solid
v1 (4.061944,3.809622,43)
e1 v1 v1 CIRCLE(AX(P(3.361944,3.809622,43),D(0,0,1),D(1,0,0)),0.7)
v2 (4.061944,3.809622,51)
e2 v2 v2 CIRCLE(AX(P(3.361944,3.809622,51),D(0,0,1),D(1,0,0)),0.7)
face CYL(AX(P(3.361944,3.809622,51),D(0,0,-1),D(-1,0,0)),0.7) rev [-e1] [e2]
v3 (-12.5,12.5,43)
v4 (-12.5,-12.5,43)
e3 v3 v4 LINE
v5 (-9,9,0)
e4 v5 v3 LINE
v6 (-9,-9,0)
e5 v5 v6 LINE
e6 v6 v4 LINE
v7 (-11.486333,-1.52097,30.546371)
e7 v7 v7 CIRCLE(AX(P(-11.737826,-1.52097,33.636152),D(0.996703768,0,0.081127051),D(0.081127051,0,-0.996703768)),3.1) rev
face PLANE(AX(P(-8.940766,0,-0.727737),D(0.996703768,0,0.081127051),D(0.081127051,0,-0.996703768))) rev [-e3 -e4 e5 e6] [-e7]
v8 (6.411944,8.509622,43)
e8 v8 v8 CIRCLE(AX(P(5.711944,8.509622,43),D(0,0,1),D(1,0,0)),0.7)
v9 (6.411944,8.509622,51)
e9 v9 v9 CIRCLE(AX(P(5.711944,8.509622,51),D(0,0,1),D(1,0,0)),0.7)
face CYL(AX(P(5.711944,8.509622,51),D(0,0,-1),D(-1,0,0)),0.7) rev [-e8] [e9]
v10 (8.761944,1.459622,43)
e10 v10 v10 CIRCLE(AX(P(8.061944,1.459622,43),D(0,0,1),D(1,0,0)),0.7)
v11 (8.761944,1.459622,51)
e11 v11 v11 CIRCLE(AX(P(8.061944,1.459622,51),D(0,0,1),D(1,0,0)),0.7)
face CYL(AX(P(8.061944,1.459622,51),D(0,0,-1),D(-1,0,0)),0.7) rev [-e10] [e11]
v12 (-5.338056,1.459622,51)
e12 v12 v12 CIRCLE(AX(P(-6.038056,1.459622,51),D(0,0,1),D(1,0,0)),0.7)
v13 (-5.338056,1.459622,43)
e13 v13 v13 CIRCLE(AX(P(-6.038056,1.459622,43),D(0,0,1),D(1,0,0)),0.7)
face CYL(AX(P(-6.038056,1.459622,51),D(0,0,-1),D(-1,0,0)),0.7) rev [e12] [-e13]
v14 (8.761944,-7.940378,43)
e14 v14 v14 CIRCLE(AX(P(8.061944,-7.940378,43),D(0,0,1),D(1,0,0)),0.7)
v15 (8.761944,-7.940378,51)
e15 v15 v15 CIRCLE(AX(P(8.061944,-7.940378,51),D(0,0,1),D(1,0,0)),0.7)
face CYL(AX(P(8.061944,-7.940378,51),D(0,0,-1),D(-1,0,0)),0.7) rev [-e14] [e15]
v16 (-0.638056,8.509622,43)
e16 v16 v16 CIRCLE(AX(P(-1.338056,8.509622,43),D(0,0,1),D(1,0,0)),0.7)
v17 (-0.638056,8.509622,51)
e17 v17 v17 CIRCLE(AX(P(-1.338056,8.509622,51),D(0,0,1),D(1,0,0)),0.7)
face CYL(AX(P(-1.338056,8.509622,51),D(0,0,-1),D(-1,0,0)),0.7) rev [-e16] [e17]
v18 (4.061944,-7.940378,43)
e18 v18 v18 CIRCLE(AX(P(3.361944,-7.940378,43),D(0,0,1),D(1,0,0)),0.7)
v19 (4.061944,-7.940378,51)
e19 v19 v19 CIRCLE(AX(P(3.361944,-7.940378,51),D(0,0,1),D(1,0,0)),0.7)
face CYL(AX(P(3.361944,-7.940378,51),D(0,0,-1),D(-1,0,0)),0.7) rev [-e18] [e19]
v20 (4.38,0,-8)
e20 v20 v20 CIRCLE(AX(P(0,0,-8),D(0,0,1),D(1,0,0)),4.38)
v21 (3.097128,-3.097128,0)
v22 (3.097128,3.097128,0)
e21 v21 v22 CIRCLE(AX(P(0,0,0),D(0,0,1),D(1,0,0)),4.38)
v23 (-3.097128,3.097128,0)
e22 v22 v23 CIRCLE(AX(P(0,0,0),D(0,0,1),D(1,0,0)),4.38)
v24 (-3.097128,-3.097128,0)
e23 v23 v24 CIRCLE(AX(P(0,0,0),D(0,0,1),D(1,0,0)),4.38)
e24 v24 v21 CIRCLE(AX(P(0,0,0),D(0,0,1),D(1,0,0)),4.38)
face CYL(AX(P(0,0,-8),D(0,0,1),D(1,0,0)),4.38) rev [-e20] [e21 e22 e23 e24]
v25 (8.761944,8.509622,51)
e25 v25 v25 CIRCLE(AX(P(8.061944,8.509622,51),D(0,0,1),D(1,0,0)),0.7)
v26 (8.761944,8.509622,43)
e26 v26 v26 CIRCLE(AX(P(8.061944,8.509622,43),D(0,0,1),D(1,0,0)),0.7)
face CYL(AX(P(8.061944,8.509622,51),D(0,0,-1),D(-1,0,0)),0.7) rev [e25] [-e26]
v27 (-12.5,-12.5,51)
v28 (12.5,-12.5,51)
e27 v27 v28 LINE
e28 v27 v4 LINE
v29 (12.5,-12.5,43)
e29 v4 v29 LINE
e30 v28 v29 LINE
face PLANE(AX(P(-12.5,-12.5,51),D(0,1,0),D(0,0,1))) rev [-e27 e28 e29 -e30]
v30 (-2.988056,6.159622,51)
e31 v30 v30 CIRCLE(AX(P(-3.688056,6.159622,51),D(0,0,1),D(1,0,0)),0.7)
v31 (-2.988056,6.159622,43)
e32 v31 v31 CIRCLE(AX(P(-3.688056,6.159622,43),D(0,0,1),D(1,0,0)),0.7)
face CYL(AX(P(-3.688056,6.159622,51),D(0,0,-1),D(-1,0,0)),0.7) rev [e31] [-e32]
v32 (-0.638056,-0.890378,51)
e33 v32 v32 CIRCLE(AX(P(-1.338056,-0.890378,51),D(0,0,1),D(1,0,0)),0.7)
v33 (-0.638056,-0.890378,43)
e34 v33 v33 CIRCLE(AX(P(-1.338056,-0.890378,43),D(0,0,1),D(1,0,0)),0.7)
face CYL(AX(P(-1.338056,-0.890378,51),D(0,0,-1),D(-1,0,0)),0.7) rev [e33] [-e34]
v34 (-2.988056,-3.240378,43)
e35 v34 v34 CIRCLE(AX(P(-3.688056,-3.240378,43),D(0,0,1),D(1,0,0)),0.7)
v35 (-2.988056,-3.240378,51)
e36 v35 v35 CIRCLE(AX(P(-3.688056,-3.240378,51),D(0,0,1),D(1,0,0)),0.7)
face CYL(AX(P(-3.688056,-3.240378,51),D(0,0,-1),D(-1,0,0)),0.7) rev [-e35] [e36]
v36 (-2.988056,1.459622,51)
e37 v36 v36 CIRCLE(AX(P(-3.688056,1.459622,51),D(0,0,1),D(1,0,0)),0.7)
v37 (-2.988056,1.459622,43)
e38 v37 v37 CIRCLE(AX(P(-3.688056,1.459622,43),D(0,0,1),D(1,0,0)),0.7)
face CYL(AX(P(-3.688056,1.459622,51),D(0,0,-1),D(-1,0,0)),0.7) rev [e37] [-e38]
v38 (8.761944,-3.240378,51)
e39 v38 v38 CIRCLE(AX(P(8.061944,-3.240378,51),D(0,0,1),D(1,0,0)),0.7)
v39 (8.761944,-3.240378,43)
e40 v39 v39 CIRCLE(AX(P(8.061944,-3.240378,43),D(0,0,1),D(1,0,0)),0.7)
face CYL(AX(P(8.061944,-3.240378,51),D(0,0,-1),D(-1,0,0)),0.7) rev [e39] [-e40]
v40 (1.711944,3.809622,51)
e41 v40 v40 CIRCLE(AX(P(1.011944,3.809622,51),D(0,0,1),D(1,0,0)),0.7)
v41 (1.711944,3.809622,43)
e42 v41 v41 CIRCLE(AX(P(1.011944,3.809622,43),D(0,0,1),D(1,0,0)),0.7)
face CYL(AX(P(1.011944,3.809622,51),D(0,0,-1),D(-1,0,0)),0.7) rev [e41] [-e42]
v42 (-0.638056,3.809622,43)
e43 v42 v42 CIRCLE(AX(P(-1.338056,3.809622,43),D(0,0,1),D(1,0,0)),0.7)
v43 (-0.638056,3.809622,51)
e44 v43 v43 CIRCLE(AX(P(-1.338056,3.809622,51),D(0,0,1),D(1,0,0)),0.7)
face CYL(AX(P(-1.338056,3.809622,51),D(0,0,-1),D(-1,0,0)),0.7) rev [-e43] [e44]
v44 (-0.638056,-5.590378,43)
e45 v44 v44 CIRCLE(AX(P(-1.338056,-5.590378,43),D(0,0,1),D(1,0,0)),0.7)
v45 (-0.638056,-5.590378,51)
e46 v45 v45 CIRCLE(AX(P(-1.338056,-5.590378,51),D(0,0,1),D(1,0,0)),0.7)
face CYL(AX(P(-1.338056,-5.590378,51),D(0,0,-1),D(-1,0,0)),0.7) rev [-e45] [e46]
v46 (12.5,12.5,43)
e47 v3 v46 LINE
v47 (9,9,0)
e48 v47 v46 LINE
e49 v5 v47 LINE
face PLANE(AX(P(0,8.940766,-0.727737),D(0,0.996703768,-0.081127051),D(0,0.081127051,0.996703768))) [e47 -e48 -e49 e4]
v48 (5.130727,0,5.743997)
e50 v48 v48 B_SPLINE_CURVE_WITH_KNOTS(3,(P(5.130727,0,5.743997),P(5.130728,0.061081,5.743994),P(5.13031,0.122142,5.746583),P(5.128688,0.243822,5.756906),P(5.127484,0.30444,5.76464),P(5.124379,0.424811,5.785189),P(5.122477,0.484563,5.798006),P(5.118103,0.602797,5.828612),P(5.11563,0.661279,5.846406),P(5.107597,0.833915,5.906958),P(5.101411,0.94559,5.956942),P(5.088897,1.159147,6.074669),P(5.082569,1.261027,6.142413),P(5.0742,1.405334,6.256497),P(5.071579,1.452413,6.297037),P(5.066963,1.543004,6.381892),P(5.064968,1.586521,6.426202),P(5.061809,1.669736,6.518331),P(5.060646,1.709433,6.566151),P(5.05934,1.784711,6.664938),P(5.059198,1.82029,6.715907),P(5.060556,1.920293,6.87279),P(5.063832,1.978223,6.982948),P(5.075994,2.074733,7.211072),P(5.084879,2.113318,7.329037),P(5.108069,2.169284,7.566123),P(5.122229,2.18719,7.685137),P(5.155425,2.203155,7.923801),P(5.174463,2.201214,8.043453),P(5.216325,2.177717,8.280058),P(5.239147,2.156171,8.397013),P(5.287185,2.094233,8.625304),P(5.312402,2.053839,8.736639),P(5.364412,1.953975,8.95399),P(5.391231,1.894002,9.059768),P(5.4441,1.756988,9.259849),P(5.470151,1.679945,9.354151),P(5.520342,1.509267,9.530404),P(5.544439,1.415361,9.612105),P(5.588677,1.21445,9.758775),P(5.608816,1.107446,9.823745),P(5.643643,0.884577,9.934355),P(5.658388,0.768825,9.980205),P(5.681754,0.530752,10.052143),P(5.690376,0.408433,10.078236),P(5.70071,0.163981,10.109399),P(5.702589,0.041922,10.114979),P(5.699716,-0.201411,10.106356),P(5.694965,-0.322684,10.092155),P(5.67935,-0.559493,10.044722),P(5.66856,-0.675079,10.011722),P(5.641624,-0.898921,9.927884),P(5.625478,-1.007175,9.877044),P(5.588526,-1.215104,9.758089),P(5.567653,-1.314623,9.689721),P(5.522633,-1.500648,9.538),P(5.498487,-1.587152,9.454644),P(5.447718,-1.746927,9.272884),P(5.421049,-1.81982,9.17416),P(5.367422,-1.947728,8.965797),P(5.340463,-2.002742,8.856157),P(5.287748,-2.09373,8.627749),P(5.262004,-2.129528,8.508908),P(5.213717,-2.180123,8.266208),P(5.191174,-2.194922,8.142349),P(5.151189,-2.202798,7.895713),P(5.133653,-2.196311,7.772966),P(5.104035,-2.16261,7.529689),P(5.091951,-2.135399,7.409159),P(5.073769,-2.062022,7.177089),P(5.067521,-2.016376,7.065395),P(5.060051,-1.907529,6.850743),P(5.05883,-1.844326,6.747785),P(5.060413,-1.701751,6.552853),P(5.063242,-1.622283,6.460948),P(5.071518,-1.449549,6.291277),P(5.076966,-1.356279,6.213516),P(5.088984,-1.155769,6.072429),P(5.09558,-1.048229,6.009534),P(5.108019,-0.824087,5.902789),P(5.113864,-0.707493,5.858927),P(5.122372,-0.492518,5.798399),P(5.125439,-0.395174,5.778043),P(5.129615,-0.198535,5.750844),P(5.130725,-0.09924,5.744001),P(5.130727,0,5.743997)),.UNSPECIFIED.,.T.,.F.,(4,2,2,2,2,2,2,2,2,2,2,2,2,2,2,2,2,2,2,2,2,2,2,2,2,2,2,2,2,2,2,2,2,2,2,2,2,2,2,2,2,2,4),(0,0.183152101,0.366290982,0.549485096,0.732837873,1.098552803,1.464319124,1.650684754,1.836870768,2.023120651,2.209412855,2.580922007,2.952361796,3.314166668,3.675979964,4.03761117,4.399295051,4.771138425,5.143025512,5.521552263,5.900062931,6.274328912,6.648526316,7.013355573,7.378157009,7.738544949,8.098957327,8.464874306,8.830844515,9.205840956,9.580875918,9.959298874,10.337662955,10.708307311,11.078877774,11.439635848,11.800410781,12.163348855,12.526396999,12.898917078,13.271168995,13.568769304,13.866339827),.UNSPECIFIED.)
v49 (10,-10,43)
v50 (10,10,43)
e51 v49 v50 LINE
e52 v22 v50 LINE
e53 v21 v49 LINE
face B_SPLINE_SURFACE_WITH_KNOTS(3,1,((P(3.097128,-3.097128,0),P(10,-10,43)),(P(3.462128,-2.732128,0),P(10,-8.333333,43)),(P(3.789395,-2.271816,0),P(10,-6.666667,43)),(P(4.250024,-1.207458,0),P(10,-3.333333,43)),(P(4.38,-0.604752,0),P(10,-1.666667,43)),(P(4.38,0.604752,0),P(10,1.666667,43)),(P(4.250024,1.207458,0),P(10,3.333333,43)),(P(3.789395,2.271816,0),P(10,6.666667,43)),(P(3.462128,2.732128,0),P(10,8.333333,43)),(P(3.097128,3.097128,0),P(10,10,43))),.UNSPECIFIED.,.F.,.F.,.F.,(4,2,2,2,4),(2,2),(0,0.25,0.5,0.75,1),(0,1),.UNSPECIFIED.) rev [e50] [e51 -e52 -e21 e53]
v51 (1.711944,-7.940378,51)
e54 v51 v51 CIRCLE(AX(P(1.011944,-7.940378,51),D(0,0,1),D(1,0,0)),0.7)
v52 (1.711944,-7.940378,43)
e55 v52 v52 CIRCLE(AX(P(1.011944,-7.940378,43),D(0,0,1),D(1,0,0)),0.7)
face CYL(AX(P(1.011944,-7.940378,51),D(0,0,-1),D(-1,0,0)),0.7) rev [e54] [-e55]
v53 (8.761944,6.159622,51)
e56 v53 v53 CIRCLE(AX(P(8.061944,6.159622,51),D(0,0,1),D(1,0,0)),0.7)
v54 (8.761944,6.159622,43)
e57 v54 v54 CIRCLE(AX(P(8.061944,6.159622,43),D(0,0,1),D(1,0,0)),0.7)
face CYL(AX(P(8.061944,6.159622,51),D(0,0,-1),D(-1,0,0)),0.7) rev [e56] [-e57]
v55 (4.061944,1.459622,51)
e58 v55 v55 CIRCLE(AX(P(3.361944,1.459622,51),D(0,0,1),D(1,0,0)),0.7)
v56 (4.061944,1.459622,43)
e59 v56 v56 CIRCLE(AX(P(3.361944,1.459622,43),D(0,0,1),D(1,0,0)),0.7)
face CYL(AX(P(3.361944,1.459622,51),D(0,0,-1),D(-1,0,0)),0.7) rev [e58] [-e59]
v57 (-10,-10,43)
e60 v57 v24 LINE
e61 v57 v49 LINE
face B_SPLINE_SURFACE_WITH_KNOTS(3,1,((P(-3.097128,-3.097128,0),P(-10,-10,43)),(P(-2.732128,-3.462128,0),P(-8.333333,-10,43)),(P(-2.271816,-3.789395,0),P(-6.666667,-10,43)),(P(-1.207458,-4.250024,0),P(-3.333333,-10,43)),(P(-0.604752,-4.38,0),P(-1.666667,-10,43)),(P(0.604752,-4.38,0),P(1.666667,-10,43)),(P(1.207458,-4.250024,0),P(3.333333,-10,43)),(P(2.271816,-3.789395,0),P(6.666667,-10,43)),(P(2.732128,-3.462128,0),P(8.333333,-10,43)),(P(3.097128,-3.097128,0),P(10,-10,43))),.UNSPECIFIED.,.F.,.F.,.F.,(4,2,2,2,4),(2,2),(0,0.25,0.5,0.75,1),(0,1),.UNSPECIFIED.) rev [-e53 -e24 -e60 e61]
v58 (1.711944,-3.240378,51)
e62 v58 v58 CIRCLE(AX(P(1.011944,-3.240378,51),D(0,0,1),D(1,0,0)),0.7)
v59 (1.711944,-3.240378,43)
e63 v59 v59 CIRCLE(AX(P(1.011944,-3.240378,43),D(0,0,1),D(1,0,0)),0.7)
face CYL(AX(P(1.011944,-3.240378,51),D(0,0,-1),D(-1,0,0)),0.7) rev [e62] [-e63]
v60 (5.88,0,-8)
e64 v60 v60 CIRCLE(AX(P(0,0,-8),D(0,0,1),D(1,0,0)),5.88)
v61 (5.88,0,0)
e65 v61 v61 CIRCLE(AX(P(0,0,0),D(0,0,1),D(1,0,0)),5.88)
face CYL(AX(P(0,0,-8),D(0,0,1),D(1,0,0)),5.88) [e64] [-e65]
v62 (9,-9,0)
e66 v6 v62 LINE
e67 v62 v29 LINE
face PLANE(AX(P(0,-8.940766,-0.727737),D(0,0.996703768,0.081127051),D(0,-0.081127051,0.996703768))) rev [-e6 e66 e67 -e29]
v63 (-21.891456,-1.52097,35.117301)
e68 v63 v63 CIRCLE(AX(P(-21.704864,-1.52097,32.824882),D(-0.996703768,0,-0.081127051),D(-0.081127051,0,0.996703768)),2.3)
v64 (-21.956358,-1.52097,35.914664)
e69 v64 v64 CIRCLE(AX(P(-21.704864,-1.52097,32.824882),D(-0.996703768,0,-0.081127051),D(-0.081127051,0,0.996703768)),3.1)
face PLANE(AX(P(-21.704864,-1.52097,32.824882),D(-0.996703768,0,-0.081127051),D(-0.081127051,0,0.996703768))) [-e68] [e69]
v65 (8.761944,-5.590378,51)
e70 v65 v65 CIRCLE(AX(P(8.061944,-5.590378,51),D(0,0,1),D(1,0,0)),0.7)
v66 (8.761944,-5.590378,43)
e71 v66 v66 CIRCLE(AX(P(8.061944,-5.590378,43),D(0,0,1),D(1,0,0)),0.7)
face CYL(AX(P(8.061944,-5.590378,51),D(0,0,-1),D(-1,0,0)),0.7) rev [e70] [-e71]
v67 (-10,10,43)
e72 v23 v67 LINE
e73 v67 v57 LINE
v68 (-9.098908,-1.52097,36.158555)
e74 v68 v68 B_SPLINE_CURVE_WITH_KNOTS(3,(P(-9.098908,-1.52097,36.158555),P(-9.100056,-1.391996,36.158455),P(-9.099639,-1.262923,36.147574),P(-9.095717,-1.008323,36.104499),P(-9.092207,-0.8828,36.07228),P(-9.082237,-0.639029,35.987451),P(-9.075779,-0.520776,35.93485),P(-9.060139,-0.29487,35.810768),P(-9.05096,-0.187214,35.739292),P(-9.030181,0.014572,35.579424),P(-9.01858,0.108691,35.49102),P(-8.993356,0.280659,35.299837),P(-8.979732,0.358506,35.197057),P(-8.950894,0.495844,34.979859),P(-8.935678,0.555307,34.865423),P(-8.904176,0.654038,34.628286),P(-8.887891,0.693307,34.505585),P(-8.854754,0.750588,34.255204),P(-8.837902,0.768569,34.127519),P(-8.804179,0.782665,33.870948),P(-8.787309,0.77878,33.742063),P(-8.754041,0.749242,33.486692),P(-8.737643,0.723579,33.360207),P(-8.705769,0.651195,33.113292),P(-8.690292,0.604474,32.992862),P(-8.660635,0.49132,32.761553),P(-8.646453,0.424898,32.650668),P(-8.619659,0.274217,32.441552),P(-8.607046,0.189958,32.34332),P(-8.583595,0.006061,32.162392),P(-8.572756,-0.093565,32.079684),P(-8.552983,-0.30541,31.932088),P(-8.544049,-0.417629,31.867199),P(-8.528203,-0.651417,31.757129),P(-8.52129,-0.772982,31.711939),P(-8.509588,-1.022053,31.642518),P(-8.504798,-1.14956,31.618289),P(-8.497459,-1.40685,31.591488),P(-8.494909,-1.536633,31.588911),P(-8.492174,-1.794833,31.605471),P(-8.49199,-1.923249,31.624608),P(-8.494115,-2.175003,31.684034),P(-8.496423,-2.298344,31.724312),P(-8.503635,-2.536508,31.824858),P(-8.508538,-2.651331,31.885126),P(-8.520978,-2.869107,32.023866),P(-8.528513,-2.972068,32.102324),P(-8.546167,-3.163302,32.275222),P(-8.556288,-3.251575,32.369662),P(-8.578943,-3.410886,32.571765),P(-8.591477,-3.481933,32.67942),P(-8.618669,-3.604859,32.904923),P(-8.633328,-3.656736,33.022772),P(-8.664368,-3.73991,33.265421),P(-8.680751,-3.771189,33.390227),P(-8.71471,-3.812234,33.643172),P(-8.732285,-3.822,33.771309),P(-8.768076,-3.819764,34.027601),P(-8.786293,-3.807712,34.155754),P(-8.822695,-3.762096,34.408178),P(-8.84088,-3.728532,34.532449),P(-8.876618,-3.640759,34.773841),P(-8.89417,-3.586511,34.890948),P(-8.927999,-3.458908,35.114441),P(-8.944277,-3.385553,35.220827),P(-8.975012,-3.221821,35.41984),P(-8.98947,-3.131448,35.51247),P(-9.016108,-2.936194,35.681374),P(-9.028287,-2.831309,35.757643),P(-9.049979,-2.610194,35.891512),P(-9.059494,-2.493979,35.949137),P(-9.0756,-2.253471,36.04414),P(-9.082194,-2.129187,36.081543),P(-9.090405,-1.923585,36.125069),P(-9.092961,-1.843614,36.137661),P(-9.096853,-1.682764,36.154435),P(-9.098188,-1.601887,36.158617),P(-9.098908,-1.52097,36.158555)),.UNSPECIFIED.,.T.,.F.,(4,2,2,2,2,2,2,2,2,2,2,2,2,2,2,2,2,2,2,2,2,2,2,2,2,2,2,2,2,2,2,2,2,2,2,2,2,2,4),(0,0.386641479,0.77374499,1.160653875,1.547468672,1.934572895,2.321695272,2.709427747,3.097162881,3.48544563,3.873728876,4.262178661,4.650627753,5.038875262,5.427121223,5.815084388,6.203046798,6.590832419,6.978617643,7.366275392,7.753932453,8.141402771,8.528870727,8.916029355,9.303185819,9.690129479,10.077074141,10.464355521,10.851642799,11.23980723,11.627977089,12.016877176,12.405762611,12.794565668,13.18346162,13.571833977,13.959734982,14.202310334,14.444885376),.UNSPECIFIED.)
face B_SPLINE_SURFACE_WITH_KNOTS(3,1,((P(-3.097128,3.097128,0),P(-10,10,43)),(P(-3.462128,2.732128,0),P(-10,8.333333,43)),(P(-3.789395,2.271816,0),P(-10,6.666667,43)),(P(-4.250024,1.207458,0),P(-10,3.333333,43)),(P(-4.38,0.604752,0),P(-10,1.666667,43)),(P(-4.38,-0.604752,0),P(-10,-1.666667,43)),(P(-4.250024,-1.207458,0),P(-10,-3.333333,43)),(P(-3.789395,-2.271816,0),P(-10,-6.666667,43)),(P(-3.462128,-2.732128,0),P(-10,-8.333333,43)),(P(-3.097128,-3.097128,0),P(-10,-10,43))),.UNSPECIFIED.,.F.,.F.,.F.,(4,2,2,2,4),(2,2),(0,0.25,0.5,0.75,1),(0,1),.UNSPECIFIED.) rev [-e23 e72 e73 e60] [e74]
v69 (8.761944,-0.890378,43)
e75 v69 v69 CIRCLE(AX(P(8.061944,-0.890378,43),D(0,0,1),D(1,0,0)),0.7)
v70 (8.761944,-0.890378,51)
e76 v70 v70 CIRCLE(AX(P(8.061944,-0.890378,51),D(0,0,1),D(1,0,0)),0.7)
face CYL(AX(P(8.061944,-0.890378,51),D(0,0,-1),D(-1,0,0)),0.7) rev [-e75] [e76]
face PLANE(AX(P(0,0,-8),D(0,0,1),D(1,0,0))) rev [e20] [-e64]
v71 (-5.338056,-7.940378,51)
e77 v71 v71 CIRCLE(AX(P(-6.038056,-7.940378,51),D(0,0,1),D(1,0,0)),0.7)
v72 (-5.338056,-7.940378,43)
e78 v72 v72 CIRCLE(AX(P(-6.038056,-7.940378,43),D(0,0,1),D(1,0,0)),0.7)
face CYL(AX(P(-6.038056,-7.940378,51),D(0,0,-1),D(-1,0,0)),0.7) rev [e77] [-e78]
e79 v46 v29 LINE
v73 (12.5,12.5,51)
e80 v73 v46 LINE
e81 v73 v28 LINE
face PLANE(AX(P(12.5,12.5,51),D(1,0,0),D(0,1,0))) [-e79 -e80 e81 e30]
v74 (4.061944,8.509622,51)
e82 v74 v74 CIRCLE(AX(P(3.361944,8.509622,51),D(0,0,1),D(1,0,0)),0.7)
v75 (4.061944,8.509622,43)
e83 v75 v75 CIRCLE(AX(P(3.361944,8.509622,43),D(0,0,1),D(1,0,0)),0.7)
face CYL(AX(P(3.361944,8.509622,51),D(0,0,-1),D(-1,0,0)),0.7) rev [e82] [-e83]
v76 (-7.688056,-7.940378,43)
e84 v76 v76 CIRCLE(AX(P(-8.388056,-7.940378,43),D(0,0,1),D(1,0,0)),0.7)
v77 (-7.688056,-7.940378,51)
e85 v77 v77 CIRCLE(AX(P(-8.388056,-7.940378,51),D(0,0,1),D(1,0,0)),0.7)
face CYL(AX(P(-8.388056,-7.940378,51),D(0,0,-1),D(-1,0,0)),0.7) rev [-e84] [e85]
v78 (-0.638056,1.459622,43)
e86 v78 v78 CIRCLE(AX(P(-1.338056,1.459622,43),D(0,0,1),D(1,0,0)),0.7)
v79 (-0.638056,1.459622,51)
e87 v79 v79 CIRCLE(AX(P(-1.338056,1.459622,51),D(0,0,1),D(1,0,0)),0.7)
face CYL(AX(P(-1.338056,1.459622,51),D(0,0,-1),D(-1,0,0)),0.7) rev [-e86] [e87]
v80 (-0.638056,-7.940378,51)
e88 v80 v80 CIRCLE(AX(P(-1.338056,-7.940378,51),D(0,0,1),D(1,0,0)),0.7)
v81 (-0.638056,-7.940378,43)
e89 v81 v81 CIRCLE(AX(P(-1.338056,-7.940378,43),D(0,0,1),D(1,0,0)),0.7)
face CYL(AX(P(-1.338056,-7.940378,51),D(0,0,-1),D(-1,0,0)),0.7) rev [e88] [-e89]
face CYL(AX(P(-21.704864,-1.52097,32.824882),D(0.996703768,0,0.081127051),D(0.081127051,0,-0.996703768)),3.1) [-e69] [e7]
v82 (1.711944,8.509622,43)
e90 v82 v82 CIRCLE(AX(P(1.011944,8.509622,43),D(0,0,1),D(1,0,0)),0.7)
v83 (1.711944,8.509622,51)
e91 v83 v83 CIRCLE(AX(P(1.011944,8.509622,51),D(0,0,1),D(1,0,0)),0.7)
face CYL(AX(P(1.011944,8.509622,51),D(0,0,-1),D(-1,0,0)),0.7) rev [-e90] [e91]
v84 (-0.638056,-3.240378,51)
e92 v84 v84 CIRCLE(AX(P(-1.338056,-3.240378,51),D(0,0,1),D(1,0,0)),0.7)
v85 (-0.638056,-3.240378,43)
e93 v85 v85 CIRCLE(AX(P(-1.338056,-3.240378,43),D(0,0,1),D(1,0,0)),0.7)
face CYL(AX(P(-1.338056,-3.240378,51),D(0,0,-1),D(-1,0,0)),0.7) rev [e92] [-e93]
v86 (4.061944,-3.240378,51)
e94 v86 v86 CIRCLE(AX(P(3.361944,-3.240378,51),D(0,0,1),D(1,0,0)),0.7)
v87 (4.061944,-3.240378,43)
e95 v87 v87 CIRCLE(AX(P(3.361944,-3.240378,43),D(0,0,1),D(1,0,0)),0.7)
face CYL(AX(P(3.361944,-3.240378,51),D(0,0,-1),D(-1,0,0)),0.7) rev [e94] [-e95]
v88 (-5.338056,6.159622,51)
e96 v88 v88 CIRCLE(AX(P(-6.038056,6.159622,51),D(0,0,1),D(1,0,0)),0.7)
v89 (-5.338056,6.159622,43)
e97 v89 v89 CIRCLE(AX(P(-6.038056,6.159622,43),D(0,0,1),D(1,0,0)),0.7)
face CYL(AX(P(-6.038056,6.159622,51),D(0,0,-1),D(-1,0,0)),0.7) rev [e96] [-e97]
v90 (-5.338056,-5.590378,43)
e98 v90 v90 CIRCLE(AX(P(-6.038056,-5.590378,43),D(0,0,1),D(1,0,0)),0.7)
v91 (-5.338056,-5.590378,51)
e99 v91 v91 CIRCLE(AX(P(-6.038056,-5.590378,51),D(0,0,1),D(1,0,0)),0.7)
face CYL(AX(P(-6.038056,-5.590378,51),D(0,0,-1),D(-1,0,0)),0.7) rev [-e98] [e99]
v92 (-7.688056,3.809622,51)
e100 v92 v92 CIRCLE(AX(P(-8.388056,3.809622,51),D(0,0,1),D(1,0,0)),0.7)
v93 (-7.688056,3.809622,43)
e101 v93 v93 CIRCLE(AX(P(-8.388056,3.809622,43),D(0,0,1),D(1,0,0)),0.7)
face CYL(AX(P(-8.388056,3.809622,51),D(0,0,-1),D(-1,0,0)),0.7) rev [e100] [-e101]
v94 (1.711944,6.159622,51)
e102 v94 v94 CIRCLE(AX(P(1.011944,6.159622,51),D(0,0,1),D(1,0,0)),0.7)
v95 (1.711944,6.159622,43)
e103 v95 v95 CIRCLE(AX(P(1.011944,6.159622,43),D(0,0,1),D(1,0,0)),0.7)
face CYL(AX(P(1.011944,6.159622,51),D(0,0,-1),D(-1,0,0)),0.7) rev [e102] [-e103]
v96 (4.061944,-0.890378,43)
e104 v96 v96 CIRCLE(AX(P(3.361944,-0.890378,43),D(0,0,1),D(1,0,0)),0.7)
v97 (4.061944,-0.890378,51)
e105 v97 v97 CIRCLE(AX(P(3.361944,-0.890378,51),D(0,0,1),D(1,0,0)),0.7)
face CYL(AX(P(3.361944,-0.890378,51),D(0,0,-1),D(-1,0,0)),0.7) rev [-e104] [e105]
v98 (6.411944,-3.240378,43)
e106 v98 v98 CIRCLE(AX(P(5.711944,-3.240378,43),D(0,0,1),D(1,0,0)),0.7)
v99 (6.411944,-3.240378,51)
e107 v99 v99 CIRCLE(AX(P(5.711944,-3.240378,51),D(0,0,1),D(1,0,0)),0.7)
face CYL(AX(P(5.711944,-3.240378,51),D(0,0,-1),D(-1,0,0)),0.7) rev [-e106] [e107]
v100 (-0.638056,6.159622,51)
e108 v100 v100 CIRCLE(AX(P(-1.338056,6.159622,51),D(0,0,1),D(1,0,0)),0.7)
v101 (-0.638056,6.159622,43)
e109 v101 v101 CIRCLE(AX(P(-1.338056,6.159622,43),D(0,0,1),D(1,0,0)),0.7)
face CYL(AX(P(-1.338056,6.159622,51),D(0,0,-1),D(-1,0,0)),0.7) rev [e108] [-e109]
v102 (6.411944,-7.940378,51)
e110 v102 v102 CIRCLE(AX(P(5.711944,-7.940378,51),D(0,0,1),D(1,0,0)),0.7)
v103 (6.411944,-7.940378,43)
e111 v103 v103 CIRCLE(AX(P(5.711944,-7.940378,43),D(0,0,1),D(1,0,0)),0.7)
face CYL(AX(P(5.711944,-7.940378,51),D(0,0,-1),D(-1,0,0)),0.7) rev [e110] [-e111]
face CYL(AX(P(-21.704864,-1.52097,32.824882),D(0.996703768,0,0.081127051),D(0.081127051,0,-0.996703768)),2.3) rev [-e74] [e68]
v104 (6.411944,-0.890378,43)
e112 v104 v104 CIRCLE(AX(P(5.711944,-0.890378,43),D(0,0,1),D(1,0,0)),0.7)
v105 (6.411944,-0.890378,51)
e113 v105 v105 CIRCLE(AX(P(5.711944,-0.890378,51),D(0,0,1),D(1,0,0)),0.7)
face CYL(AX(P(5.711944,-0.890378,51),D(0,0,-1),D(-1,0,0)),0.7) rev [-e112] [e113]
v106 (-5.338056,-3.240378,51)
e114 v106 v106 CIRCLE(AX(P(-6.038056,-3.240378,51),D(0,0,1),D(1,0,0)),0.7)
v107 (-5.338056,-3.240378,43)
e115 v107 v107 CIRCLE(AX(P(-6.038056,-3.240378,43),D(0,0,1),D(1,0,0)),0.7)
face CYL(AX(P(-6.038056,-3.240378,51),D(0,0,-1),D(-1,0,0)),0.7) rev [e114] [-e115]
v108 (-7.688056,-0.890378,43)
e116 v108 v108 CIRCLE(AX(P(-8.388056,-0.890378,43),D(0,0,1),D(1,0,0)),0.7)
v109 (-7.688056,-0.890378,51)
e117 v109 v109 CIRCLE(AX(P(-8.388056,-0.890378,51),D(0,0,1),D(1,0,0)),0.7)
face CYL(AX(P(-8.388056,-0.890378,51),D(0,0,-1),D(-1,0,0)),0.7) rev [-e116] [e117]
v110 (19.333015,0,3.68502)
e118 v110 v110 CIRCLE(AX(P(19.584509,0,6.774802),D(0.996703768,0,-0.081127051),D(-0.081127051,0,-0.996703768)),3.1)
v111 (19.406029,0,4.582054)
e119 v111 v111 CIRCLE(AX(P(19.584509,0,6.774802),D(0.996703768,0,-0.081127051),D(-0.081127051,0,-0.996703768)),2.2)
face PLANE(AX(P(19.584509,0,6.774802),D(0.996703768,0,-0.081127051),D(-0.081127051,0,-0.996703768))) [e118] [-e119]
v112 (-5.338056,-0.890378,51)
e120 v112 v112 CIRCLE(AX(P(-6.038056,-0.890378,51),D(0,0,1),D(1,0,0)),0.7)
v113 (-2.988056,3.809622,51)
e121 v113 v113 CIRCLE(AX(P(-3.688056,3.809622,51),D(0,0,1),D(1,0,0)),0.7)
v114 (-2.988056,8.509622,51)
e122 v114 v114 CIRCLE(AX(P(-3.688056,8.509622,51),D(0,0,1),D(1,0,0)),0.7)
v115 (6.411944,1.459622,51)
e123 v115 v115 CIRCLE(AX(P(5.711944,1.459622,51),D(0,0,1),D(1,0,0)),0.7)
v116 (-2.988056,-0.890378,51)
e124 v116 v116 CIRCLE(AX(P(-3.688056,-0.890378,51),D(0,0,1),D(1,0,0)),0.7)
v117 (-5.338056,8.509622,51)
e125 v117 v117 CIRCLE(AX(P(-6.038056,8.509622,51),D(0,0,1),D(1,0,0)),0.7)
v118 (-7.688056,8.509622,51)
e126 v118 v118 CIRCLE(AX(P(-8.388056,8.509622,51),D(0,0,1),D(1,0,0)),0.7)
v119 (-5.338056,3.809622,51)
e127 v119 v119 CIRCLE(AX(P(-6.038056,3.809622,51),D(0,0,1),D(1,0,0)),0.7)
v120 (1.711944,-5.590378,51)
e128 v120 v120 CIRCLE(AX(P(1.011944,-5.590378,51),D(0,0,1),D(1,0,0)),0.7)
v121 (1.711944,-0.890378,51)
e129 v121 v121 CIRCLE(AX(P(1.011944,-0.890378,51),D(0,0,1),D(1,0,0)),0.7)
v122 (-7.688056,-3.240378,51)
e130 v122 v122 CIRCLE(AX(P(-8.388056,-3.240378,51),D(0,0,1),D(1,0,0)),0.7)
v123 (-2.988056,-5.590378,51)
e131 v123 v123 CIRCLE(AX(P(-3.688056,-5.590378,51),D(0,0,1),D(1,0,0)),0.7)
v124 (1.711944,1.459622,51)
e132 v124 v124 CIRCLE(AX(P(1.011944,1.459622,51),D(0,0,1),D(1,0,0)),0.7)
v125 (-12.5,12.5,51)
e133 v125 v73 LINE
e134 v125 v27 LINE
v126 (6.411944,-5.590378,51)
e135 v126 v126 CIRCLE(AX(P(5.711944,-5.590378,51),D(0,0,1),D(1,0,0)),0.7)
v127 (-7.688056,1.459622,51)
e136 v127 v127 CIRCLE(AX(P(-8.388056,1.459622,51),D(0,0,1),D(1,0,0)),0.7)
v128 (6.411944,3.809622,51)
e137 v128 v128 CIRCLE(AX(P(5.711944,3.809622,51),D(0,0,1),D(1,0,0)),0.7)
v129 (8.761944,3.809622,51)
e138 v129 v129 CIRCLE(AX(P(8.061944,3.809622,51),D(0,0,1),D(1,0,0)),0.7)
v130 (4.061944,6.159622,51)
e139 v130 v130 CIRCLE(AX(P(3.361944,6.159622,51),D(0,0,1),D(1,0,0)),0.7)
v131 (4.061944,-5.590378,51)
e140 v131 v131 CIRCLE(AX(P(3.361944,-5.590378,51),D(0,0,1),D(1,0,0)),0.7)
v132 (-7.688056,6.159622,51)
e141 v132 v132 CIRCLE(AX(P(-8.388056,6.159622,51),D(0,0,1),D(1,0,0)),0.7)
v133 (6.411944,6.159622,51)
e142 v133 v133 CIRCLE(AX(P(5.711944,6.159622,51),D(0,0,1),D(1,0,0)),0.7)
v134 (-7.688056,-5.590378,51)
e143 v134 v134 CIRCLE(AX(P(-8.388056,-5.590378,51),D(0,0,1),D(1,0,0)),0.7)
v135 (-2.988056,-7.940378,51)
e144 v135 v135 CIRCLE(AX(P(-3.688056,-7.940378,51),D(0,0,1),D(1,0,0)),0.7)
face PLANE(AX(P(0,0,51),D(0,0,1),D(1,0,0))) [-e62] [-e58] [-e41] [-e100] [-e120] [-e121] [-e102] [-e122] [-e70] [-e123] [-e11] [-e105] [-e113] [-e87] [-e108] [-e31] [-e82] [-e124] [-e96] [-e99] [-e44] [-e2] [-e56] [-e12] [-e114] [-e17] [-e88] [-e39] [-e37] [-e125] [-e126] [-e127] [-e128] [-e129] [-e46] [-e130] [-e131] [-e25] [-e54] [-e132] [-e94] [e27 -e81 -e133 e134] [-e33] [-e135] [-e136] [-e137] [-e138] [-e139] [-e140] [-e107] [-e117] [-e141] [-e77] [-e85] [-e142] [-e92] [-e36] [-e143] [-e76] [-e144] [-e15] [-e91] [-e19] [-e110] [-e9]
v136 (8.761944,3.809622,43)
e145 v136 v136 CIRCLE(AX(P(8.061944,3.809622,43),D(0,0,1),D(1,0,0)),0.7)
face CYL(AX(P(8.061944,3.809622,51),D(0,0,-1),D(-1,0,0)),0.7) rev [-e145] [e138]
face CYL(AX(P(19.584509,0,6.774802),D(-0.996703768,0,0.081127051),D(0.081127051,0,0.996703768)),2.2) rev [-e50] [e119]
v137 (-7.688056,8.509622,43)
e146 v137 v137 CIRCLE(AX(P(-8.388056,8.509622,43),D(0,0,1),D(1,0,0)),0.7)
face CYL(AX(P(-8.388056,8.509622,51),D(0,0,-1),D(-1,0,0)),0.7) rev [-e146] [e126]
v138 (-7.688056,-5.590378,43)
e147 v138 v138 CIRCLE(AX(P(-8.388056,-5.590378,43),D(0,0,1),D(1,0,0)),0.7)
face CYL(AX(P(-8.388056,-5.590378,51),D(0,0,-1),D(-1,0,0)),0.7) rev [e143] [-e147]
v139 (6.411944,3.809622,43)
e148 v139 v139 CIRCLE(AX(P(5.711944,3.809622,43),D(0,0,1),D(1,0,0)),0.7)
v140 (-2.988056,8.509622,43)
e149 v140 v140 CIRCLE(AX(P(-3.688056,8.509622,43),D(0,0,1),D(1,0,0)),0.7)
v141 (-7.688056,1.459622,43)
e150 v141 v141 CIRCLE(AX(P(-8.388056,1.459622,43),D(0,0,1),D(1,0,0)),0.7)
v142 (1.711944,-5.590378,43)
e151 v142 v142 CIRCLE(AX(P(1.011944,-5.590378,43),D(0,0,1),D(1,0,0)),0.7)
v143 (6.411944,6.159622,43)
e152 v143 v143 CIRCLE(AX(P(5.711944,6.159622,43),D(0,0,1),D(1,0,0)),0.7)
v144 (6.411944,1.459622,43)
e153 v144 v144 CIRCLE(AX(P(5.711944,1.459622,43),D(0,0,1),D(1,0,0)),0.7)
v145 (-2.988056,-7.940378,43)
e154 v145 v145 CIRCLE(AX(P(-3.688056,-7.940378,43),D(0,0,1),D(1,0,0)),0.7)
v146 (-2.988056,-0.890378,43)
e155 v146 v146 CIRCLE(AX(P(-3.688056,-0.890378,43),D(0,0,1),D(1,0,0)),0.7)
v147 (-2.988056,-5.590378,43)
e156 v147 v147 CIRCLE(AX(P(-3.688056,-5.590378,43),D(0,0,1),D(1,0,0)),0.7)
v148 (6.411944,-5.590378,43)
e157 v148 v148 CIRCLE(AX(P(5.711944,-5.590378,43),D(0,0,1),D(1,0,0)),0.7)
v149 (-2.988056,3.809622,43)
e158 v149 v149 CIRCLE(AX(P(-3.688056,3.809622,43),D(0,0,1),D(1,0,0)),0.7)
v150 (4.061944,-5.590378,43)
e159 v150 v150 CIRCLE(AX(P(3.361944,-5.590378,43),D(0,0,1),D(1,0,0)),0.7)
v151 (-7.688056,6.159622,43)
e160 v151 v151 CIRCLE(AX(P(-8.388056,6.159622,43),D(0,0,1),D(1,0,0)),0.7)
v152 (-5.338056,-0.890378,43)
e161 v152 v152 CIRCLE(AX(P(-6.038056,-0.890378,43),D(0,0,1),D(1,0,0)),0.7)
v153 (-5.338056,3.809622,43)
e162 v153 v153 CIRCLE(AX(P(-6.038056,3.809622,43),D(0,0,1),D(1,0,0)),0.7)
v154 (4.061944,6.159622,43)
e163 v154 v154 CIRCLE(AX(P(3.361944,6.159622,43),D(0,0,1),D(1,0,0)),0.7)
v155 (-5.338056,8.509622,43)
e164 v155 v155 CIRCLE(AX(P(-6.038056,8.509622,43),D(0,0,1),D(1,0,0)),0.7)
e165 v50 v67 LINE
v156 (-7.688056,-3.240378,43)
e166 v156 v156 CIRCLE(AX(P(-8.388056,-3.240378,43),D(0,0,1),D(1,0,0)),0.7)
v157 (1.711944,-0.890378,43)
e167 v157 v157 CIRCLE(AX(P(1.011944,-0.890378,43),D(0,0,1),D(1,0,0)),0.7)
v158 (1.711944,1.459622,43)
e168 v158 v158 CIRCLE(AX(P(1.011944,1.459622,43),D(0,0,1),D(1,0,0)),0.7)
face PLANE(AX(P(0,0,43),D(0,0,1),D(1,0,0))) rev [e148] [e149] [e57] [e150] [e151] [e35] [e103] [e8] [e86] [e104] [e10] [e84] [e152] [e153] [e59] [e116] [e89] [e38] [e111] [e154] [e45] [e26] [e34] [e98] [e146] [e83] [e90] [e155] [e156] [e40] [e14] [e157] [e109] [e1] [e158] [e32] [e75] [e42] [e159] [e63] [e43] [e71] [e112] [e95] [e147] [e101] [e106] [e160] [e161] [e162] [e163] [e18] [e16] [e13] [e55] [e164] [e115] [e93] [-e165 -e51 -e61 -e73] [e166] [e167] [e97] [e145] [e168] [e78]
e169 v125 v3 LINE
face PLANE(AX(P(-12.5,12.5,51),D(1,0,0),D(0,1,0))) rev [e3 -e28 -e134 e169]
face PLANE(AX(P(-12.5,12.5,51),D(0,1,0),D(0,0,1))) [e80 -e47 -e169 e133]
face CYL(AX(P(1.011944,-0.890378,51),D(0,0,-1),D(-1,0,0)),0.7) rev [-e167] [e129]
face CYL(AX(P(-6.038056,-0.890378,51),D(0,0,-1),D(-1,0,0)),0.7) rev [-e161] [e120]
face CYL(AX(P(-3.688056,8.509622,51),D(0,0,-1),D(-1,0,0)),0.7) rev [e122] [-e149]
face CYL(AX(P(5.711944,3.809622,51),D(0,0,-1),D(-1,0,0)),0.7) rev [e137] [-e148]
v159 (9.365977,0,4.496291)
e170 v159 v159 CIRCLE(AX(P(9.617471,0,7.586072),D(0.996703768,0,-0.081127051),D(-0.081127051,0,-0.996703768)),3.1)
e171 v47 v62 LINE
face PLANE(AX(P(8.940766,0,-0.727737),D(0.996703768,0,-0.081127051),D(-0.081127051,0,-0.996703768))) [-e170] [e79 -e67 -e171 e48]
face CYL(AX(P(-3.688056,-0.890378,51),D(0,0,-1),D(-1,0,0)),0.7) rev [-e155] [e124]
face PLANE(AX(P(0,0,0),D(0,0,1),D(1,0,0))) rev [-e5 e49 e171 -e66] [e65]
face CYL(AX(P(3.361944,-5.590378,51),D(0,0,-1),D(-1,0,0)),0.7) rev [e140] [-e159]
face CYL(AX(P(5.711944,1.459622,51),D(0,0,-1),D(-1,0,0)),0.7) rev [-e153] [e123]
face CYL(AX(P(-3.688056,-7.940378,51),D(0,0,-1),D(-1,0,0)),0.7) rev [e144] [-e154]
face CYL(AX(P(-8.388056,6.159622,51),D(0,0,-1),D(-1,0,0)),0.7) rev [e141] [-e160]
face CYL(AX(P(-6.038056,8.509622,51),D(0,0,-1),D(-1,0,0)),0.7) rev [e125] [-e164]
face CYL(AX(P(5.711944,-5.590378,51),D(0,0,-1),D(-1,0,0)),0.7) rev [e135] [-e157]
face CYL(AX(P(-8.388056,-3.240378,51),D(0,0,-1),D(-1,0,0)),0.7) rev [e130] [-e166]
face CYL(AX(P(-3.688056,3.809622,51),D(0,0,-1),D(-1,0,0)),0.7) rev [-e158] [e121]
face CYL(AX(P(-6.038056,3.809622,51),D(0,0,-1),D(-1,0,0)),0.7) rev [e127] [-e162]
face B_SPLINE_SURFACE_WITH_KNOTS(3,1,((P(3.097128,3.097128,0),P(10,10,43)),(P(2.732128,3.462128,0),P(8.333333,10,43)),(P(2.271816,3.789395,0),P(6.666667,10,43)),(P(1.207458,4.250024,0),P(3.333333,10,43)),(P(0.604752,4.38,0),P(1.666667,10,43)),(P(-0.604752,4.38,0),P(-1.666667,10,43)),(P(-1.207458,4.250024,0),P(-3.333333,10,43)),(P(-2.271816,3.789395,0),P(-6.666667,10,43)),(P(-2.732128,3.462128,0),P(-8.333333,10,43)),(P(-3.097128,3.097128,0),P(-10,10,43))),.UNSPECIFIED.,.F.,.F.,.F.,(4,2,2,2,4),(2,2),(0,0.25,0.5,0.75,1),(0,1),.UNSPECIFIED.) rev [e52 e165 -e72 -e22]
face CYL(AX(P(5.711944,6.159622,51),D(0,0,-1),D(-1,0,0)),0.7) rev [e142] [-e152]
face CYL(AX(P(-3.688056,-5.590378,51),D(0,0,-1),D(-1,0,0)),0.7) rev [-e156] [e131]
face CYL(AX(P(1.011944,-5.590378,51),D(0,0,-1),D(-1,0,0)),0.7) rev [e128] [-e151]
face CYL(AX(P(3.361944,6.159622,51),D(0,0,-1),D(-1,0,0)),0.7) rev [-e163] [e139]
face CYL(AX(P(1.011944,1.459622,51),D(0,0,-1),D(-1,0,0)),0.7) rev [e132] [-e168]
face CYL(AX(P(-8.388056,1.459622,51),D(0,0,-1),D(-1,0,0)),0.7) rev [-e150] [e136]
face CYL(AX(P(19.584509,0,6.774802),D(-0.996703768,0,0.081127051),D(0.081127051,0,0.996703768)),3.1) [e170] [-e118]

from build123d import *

# Parameters (mm, degrees)
SKETCH2_4_W         = 25
SKETCH2_4_H         = 25
BOSS_EXTRUDE2_DEPTH = 8
SKETCH5_R           = 0.7
CUT_EXTRUDE1_DEPTH  = 8
SKETCH6_R           = 3.1
SKETCH6_R_2         = 2.3
BOSS_EXTRUDE4_DEPTH = 10
CUT_EXTRUDE2_START  = -4
SKETCH6_4_R         = 2.3
CUT_EXTRUDE2_DEPTH  = 4
SKETCH9_R           = 3.1
SKETCH9_R_2         = 2.2
BOSS_EXTRUDE5_DEPTH = 10
SKETCH1_7_R         = 5.88
SKETCH1_7_R_2       = 4.38
BOSS_EXTRUDE7_DEPTH = 8
CUT_EXTRUDE3_START  = -20
SKETCH10_R          = 2.2
CUT_EXTRUDE3_DEPTH  = 20


with BuildPart() as part:
    # Sketch1 → Loft1 section 0
    with BuildSketch(Plane.XY):
        with BuildLine():
            Line((-9, 9), (9, 9))
            Line((9, 9), (9, -9))
            Line((9, -9), (-9, -9))
            Line((-9, -9), (-9, 9))
        make_face()
    # Sketch2 → Loft1 section 1
    with BuildSketch(Plane.XY.offset(43)):
        with BuildLine():
            Line((-12.5, 12.5), (12.5, 12.5))
            Line((12.5, 12.5), (12.5, -12.5))
            Line((12.5, -12.5), (-12.5, -12.5))
            Line((-12.5, -12.5), (-12.5, 12.5))
        make_face()
    loft()

    # Cut-Loft1: read off the stored shape, not the designer's step
    # Cut-Loft1: loft between two sections, ruled curve by curve
    cut_loft1_from = [
        Edge.make_bspline([(-3.097127702, -3.097127702, 0), (-2.732127702, -3.462127702, 0), (-2.271815958, -3.789394651, 0), (-1.207457606, -4.2500242, 0), (-0.604751801, -4.38, 0), (0.604751801, -4.38, 0), (1.207457606, -4.2500242, 0), (2.271815958, -3.789394651, 0), (2.732127702, -3.462127702, 0), (3.097127702, -3.097127702, 0)], [0, 0, 0, 0, 0.25, 0.25, 0.5, 0.5, 0.75, 0.75, 1, 1, 1, 1], 3),
        Edge.make_bspline([(3.097127702, -3.097127702, 0), (3.462127702, -2.732127702, 0), (3.789394651, -2.271815958, 0), (4.2500242, -1.207457606, 0), (4.38, -0.604751801, 0), (4.38, 0.604751801, 0), (4.2500242, 1.207457606, 0), (3.789394651, 2.271815958, 0), (3.462127702, 2.732127702, 0), (3.097127702, 3.097127702, 0)], [0, 0, 0, 0, 0.25, 0.25, 0.5, 0.5, 0.75, 0.75, 1, 1, 1, 1], 3),
        Edge.make_bspline([(-3.097127702, 3.097127702, 0), (-3.462127702, 2.732127702, 0), (-3.789394651, 2.271815958, 0), (-4.2500242, 1.207457606, 0), (-4.38, 0.604751801, 0), (-4.38, -0.604751801, 0), (-4.2500242, -1.207457606, 0), (-3.789394651, -2.271815958, 0), (-3.462127702, -2.732127702, 0), (-3.097127702, -3.097127702, 0)], [0, 0, 0, 0, 0.25, 0.25, 0.5, 0.5, 0.75, 0.75, 1, 1, 1, 1], 3),
        Edge.make_bspline([(3.097127702, 3.097127702, 0), (2.732127702, 3.462127702, 0), (2.271815958, 3.789394651, 0), (1.207457606, 4.2500242, 0), (0.604751801, 4.38, 0), (-0.604751801, 4.38, 0), (-1.207457606, 4.2500242, 0), (-2.271815958, 3.789394651, 0), (-2.732127702, 3.462127702, 0), (-3.097127702, 3.097127702, 0)], [0, 0, 0, 0, 0.25, 0.25, 0.5, 0.5, 0.75, 0.75, 1, 1, 1, 1], 3),
    ]
    cut_loft1_to = [
        Edge.make_bspline([(-10, -10, 43), (-8.333333333, -10, 43), (-6.666666667, -10, 43), (-3.333333333, -10, 43), (-1.666666667, -10, 43), (1.666666667, -10, 43), (3.333333333, -10, 43), (6.666666667, -10, 43), (8.333333333, -10, 43), (10, -10, 43)], [0, 0, 0, 0, 0.25, 0.25, 0.5, 0.5, 0.75, 0.75, 1, 1, 1, 1], 3),
        Edge.make_bspline([(10, -10, 43), (10, -8.333333333, 43), (10, -6.666666667, 43), (10, -3.333333333, 43), (10, -1.666666667, 43), (10, 1.666666667, 43), (10, 3.333333333, 43), (10, 6.666666667, 43), (10, 8.333333333, 43), (10, 10, 43)], [0, 0, 0, 0, 0.25, 0.25, 0.5, 0.5, 0.75, 0.75, 1, 1, 1, 1], 3),
        Edge.make_bspline([(-10, 10, 43), (-10, 8.333333333, 43), (-10, 6.666666667, 43), (-10, 3.333333333, 43), (-10, 1.666666667, 43), (-10, -1.666666667, 43), (-10, -3.333333333, 43), (-10, -6.666666667, 43), (-10, -8.333333333, 43), (-10, -10, 43)], [0, 0, 0, 0, 0.25, 0.25, 0.5, 0.5, 0.75, 0.75, 1, 1, 1, 1], 3),
        Edge.make_bspline([(10, 10, 43), (8.333333333, 10, 43), (6.666666667, 10, 43), (3.333333333, 10, 43), (1.666666667, 10, 43), (-1.666666667, 10, 43), (-3.333333333, 10, 43), (-6.666666667, 10, 43), (-8.333333333, 10, 43), (-10, 10, 43)], [0, 0, 0, 0, 0.25, 0.25, 0.5, 0.5, 0.75, 0.75, 1, 1, 1, 1], 3),
    ]
    cut_loft1 = Solid(Shell([*[Face.make_surface_from_curves(cut_loft1_from[k], cut_loft1_to[k]) for k in range(4)], Face(Wire(cut_loft1_from)), Face(Wire(cut_loft1_to))]))
    add(cut_loft1, mode=Mode.SUBTRACT)

    # Sketch2<4> → Boss-Extrude2 (add)
    with BuildSketch(Plane.XY.offset(43)):
        Rectangle(SKETCH2_4_W, SKETCH2_4_H)
    extrude(amount=BOSS_EXTRUDE2_DEPTH)

    # Sketch5 → Cut-Extrude1 (cut)
    with BuildSketch(Plane.XY.offset(43)):
        with Locations((-8.388056057, 8.509622087)):
            Circle(SKETCH5_R)
        with Locations((-6.038056057, 8.509622087)):
            Circle(SKETCH5_R)
        with Locations((-3.688056057, 8.509622087)):
            Circle(SKETCH5_R)
        with Locations((-1.338056057, 8.509622087)):
            Circle(SKETCH5_R)
        with Locations((1.011943943, 8.509622087)):
            Circle(SKETCH5_R)
        with Locations((3.361943943, 8.509622087)):
            Circle(SKETCH5_R)
        with Locations((5.711943943, 8.509622087)):
            Circle(SKETCH5_R)
        with Locations((8.061943943, 8.509622087)):
            Circle(SKETCH5_R)
        with Locations((-6.038056057, 6.159622087)):
            Circle(SKETCH5_R)
        with Locations((-3.688056057, 6.159622087)):
            Circle(SKETCH5_R)
        with Locations((-1.338056057, 6.159622087)):
            Circle(SKETCH5_R)
        with Locations((1.011943943, 6.159622087)):
            Circle(SKETCH5_R)
        with Locations((3.361943943, 6.159622087)):
            Circle(SKETCH5_R)
        with Locations((5.711943943, 6.159622087)):
            Circle(SKETCH5_R)
        with Locations((8.061943943, 6.159622087)):
            Circle(SKETCH5_R)
        with Locations((-6.038056057, 3.809622087)):
            Circle(SKETCH5_R)
        with Locations((-3.688056057, 3.809622087)):
            Circle(SKETCH5_R)
        with Locations((-1.338056057, 3.809622087)):
            Circle(SKETCH5_R)
        with Locations((1.011943943, 3.809622087)):
            Circle(SKETCH5_R)
        with Locations((3.361943943, 3.809622087)):
            Circle(SKETCH5_R)
        with Locations((5.711943943, 3.809622087)):
            Circle(SKETCH5_R)
        with Locations((8.061943943, 3.809622087)):
            Circle(SKETCH5_R)
        with Locations((-6.038056057, 1.459622087)):
            Circle(SKETCH5_R)
        with Locations((-3.688056057, 1.459622087)):
            Circle(SKETCH5_R)
        with Locations((-1.338056057, 1.459622087)):
            Circle(SKETCH5_R)
        with Locations((1.011943943, 1.459622087)):
            Circle(SKETCH5_R)
        with Locations((3.361943943, 1.459622087)):
            Circle(SKETCH5_R)
        with Locations((5.711943943, 1.459622087)):
            Circle(SKETCH5_R)
        with Locations((8.061943943, 1.459622087)):
            Circle(SKETCH5_R)
        with Locations((-6.038056057, -0.890377913)):
            Circle(SKETCH5_R)
        with Locations((-3.688056057, -0.890377913)):
            Circle(SKETCH5_R)
        with Locations((-1.338056057, -0.890377913)):
            Circle(SKETCH5_R)
        with Locations((1.011943943, -0.890377913)):
            Circle(SKETCH5_R)
        with Locations((3.361943943, -0.890377913)):
            Circle(SKETCH5_R)
        with Locations((5.711943943, -0.890377913)):
            Circle(SKETCH5_R)
        with Locations((8.061943943, -0.890377913)):
            Circle(SKETCH5_R)
        with Locations((-6.038056057, -3.240377913)):
            Circle(SKETCH5_R)
        with Locations((-3.688056057, -3.240377913)):
            Circle(SKETCH5_R)
        with Locations((-1.338056057, -3.240377913)):
            Circle(SKETCH5_R)
        with Locations((1.011943943, -3.240377913)):
            Circle(SKETCH5_R)
        with Locations((3.361943943, -3.240377913)):
            Circle(SKETCH5_R)
        with Locations((5.711943943, -3.240377913)):
            Circle(SKETCH5_R)
        with Locations((8.061943943, -3.240377913)):
            Circle(SKETCH5_R)
        with Locations((-6.038056057, -5.590377913)):
            Circle(SKETCH5_R)
        with Locations((-3.688056057, -5.590377913)):
            Circle(SKETCH5_R)
        with Locations((-1.338056057, -5.590377913)):
            Circle(SKETCH5_R)
        with Locations((1.011943943, -5.590377913)):
            Circle(SKETCH5_R)
        with Locations((3.361943943, -5.590377913)):
            Circle(SKETCH5_R)
        with Locations((5.711943943, -5.590377913)):
            Circle(SKETCH5_R)
        with Locations((8.061943943, -5.590377913)):
            Circle(SKETCH5_R)
        with Locations((-6.038056057, -7.940377913)):
            Circle(SKETCH5_R)
        with Locations((-3.688056057, -7.940377913)):
            Circle(SKETCH5_R)
        with Locations((-1.338056057, -7.940377913)):
            Circle(SKETCH5_R)
        with Locations((1.011943943, -7.940377913)):
            Circle(SKETCH5_R)
        with Locations((3.361943943, -7.940377913)):
            Circle(SKETCH5_R)
        with Locations((5.711943943, -7.940377913)):
            Circle(SKETCH5_R)
        with Locations((8.061943943, -7.940377913)):
            Circle(SKETCH5_R)
        with Locations((-8.388056057, 6.159622087)):
            Circle(SKETCH5_R)
        with Locations((-8.388056057, 3.809622087)):
            Circle(SKETCH5_R)
        with Locations((-8.388056057, 1.459622087)):
            Circle(SKETCH5_R)
        with Locations((-8.388056057, -0.890377913)):
            Circle(SKETCH5_R)
        with Locations((-8.388056057, -3.240377913)):
            Circle(SKETCH5_R)
        with Locations((-8.388056057, -5.590377913)):
            Circle(SKETCH5_R)
        with Locations((-8.388056057, -7.940377913)):
            Circle(SKETCH5_R)
    extrude(amount=CUT_EXTRUDE1_DEPTH, mode=Mode.SUBTRACT)

    # Sketch6 → Boss-Extrude4 (add)
    with BuildSketch(Plane(origin=(-8.940765615, 0, -0.727736736), x_dir=(-0.08112705090276601, 0, 0.9967037682339824), z_dir=(-0.9967037682339824, 0, -0.08112705090276602))):
        with Locations(Location((34.477535136, -1.520969622, 0), (0, 0, 180))):
            Circle(SKETCH6_R)
        with Locations((34.477535136, -1.520969622)):
            Circle(SKETCH6_R_2, mode=Mode.SUBTRACT)
    extrude(amount=BOSS_EXTRUDE4_DEPTH)

    # Sketch6<4> → Cut-Extrude2 (cut)
    with BuildSketch(Plane(origin=(-8.940765615, 0, -0.727736736), x_dir=(-0.08112705090276601, 0, 0.9967037682339824), z_dir=(-0.9967037682339824, 0, -0.08112705090276602)).offset(CUT_EXTRUDE2_START)):
        with Locations((34.477535136, -1.520969622)):
            Circle(SKETCH6_4_R)
    extrude(amount=CUT_EXTRUDE2_DEPTH, mode=Mode.SUBTRACT)

    # Sketch9 → Boss-Extrude5 (add)
    with BuildSketch(Plane(origin=(8.940765615, 0, -0.727736736), x_dir=(-0.08112705090276603, 0, -0.9967037682339824), z_dir=(0.9967037682339824, 0, -0.08112705090276605))):
        with Locations((-8.341303969, 0)):
            Circle(SKETCH9_R)
        with Locations((-8.341303969, 0)):
            Circle(SKETCH9_R_2, mode=Mode.SUBTRACT)
    extrude(amount=BOSS_EXTRUDE5_DEPTH)

    # Sketch1<7> → Boss-Extrude7 (add)
    with BuildSketch(Plane.XY):
        Circle(SKETCH1_7_R)
        Circle(SKETCH1_7_R_2, mode=Mode.SUBTRACT)
    extrude(amount=-BOSS_EXTRUDE7_DEPTH)

    # Sketch10 → Cut-Extrude3 (cut)
    with BuildSketch(Plane(origin=(18.907803297, 0, -1.539007245), x_dir=(-0.08112705090276605, 0, -0.9967037682339824), z_dir=(0.9967037682339824, 0, -0.08112705090276606)).offset(CUT_EXTRUDE3_START)):
        with Locations((-8.341303969, 0)):
            Circle(SKETCH10_R)
    extrude(amount=CUT_EXTRUDE3_DEPTH, mode=Mode.SUBTRACT)


solid = part.part
